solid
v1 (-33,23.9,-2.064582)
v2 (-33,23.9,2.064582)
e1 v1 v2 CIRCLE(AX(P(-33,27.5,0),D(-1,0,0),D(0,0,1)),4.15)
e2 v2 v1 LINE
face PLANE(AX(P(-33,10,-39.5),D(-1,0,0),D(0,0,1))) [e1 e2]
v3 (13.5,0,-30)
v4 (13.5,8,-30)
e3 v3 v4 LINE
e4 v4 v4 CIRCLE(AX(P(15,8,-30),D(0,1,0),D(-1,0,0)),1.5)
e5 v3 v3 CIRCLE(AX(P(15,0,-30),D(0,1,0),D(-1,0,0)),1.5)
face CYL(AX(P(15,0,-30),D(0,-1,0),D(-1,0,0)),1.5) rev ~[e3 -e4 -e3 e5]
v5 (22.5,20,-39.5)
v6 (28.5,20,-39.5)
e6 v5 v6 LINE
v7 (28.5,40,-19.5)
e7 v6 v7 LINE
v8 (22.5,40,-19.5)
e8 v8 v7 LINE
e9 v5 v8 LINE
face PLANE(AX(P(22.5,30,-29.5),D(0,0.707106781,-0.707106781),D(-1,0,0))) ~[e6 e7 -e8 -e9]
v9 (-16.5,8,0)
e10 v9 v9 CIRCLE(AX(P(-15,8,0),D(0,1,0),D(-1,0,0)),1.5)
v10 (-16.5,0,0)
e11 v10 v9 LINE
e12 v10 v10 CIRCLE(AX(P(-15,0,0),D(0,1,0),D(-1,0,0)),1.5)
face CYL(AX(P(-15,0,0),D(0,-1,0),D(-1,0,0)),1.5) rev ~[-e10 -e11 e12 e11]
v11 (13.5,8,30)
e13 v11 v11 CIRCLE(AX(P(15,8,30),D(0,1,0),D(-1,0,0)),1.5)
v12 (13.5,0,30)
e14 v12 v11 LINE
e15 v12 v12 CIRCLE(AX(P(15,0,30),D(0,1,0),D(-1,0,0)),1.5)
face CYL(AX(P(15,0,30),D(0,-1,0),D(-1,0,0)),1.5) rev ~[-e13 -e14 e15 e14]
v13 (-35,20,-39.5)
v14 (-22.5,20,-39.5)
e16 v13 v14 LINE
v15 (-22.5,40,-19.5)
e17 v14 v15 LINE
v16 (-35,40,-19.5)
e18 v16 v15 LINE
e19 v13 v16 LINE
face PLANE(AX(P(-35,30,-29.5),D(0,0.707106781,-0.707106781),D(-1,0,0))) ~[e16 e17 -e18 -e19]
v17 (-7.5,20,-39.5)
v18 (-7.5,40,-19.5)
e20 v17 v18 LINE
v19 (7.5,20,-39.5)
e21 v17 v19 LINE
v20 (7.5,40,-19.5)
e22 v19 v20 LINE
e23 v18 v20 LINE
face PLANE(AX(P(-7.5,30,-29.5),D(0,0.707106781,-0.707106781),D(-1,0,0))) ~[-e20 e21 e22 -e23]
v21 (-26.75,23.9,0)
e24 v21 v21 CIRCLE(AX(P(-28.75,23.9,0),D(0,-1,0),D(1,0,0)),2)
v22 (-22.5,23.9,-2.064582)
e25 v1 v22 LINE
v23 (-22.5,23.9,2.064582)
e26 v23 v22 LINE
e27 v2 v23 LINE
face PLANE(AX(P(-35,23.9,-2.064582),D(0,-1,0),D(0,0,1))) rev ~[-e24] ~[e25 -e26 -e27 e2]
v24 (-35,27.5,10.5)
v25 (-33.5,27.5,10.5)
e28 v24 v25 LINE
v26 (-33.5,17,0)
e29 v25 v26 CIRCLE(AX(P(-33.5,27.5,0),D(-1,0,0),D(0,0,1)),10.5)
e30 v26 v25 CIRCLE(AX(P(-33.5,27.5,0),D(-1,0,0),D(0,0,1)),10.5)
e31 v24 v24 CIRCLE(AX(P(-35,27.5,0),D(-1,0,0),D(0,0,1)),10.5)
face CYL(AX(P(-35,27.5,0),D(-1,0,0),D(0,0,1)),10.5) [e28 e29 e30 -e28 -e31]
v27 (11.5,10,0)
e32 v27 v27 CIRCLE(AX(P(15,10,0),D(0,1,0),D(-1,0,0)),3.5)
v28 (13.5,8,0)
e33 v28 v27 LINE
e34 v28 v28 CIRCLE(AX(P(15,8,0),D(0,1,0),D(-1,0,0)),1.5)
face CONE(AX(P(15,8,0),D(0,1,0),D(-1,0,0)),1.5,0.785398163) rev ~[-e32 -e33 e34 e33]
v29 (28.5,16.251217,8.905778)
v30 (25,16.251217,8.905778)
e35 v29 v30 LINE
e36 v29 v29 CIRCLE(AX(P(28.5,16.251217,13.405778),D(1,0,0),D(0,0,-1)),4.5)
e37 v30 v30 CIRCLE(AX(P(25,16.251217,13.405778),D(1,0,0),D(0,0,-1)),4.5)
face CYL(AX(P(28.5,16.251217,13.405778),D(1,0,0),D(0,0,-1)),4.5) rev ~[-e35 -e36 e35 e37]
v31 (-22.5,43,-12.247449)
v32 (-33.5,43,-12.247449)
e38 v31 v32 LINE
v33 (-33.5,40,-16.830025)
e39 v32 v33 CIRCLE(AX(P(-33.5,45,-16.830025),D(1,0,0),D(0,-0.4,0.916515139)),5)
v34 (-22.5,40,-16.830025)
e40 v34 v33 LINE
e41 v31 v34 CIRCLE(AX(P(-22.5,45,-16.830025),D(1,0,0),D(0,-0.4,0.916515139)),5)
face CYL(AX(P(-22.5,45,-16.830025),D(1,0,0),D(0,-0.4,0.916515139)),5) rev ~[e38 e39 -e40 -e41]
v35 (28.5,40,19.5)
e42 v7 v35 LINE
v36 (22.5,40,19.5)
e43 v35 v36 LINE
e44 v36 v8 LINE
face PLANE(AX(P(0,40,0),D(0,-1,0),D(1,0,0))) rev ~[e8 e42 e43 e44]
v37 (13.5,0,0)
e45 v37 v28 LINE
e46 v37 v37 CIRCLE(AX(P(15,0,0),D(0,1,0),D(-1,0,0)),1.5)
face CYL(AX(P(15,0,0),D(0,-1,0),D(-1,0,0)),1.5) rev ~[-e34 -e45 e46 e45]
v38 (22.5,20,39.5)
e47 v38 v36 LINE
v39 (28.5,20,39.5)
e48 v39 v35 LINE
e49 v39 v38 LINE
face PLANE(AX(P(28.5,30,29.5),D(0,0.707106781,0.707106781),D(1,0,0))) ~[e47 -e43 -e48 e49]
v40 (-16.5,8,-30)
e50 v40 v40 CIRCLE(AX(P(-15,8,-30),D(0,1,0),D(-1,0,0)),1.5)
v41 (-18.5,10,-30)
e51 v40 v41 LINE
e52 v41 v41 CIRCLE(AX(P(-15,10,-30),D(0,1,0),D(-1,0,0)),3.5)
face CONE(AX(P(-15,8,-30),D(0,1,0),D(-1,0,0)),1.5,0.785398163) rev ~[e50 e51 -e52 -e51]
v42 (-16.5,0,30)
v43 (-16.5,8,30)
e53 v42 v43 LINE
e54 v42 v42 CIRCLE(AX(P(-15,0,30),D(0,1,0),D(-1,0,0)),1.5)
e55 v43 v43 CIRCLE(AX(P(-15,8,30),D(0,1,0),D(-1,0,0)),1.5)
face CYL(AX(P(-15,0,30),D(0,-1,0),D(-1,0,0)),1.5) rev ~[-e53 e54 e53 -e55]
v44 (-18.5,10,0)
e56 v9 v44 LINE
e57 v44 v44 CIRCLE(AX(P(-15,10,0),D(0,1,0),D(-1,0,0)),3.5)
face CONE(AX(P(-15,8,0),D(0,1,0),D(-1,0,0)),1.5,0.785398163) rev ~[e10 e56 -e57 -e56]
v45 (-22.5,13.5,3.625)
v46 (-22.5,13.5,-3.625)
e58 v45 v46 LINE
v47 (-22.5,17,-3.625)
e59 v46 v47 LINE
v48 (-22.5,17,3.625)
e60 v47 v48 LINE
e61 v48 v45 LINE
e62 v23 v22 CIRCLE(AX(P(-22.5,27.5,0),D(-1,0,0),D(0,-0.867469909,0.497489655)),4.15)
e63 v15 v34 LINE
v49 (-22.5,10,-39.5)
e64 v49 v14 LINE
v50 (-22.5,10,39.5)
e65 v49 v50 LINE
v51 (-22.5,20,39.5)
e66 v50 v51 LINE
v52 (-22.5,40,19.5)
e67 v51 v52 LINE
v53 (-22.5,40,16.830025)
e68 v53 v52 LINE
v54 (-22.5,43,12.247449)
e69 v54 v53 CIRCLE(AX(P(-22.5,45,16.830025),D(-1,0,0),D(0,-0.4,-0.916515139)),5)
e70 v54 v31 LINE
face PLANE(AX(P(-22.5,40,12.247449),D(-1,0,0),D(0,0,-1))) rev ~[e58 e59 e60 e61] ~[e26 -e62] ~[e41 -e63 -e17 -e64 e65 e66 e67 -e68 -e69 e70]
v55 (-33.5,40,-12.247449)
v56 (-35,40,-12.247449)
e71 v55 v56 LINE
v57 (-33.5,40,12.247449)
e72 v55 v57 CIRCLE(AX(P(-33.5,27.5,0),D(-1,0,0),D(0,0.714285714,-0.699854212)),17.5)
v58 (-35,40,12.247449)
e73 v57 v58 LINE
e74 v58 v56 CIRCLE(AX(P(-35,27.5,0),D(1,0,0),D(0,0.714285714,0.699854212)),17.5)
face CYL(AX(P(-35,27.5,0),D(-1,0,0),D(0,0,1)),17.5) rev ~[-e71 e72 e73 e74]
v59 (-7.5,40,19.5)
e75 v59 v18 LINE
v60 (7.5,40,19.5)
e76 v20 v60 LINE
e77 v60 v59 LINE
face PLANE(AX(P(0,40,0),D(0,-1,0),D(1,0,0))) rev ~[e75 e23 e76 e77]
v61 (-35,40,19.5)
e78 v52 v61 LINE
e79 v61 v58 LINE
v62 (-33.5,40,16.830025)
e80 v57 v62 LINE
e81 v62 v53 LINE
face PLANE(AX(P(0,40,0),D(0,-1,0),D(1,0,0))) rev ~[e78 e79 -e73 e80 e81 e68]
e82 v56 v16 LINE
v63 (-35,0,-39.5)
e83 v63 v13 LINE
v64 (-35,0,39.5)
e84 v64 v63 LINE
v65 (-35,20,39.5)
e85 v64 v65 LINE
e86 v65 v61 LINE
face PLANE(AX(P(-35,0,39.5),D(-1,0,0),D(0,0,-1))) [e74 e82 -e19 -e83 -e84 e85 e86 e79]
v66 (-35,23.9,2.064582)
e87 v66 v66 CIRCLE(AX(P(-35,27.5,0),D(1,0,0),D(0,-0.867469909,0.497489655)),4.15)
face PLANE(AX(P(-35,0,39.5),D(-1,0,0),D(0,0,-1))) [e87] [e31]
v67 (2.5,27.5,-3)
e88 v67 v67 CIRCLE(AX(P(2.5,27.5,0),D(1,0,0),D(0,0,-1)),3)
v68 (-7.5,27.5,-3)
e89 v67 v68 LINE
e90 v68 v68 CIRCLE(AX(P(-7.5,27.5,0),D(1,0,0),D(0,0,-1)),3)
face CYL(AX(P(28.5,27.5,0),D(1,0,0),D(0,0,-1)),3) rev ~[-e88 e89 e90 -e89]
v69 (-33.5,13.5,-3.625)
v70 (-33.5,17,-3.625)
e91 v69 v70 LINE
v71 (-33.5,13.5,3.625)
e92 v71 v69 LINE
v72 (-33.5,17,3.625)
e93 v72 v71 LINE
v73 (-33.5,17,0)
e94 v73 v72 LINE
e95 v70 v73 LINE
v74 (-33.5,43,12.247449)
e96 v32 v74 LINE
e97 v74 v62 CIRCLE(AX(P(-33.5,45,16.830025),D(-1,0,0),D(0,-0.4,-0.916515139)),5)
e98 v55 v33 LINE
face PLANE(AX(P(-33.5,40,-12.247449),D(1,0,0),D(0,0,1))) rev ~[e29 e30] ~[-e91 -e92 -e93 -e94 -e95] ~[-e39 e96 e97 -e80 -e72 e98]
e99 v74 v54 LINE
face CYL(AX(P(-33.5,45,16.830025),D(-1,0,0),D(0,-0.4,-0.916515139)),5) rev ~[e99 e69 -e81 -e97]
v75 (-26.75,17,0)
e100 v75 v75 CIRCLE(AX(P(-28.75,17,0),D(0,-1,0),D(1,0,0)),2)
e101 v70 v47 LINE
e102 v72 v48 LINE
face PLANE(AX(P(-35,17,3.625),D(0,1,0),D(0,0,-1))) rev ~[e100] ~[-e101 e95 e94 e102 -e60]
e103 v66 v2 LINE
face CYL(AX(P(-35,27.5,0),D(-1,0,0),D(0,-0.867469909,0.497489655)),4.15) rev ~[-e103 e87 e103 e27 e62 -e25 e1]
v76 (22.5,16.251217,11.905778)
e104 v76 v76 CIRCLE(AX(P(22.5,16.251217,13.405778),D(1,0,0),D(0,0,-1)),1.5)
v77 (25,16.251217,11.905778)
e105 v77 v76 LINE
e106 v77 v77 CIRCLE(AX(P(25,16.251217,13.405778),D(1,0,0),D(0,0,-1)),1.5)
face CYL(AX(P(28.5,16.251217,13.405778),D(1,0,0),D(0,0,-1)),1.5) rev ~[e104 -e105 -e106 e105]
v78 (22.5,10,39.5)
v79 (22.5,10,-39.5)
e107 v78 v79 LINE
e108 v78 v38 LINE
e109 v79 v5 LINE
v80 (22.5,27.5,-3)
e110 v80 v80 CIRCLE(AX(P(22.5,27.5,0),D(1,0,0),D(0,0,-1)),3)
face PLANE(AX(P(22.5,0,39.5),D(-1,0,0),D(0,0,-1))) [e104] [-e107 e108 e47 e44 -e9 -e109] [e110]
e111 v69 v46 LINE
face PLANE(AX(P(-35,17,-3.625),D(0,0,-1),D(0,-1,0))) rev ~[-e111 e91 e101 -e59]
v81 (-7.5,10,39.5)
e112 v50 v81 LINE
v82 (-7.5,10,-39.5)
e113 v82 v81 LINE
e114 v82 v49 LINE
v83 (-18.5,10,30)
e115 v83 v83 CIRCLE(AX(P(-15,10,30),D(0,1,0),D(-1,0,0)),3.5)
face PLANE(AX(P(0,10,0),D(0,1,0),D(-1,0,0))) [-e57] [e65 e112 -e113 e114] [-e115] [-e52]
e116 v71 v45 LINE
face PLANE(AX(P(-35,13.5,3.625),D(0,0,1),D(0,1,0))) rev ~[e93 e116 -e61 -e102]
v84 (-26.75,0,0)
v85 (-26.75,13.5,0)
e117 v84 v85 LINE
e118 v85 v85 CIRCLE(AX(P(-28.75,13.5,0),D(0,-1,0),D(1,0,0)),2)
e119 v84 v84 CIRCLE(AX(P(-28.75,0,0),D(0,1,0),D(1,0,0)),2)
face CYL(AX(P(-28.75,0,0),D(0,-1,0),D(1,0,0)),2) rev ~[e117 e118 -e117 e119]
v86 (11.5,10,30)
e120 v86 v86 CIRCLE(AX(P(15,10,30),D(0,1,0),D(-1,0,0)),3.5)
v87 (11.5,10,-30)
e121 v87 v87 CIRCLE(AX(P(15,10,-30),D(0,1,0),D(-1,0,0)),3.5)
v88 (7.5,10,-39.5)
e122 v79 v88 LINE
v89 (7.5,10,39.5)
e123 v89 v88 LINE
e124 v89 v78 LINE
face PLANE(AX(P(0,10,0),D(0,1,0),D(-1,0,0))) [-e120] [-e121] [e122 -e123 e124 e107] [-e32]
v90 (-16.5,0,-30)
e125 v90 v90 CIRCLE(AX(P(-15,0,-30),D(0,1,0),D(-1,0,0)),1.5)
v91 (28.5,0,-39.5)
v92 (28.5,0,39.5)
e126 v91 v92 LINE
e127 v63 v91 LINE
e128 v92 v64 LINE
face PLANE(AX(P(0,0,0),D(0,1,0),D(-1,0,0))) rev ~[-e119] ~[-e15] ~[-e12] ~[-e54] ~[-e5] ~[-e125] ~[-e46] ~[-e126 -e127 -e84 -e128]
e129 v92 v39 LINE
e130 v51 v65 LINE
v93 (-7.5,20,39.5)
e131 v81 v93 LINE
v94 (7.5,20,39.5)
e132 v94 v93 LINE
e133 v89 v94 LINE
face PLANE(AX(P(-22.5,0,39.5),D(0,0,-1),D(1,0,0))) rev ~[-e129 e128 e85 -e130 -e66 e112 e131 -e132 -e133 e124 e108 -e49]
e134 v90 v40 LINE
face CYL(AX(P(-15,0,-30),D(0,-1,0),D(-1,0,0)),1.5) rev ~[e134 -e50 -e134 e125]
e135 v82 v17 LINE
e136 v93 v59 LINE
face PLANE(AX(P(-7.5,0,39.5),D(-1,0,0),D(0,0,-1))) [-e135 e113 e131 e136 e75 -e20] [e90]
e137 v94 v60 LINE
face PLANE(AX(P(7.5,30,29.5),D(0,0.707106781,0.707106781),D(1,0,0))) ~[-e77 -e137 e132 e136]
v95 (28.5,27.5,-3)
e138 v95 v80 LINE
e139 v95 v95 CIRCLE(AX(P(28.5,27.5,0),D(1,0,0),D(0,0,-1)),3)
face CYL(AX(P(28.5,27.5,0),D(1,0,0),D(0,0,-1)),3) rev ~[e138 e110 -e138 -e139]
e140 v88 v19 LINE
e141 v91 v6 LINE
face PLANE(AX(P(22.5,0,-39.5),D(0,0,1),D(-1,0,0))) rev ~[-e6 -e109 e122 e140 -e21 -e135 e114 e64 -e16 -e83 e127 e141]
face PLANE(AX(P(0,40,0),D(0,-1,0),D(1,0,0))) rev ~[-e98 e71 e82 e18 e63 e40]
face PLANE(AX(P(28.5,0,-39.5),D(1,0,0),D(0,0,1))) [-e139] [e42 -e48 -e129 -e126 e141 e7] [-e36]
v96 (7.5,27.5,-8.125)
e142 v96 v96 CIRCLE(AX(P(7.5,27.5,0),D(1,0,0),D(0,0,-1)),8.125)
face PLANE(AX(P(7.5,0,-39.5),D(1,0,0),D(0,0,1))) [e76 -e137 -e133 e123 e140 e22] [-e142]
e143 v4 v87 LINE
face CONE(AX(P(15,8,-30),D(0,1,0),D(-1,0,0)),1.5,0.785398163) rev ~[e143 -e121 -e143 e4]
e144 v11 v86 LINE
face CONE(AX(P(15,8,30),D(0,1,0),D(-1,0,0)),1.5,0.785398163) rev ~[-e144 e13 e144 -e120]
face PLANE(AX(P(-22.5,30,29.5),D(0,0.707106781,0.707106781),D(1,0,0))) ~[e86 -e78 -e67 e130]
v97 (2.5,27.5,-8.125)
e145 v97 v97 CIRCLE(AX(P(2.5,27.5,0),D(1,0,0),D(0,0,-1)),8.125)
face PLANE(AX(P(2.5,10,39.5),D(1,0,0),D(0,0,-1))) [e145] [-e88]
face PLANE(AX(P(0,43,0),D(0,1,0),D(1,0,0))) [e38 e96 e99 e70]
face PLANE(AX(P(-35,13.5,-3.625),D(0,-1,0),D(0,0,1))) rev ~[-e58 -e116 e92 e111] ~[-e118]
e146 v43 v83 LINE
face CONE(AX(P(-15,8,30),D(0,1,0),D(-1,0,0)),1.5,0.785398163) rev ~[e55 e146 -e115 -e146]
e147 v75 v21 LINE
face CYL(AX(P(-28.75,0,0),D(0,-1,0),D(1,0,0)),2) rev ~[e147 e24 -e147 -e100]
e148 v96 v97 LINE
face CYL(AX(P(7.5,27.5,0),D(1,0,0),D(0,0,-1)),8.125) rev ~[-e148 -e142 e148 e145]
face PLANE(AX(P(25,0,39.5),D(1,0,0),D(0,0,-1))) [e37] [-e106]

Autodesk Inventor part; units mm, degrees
ref_plane "YZ Plane" through (0, 0, 0) normal (1, 0, 0) x (0, 1, 0)
ref_plane "XZ Plane" through (0, 0, 0) normal (0, 1, 0) x (-1, 0, 0)
sketch "Sketch1" plane through (0, 0, 0) normal (0, 1, 0) x (-1, 0, 0)
  line L0 (15, 30) -> (-15, 30)
  line L1 (-15, 30) -> (-15, -30)
  line L2 (-15, -30) -> (15, -30)
  line L3 (15, -30) -> (15, 30)
  line L4 (15, 30) -> (-15, -30) construction
  line L5 (-15, 30) -> (15, -30) construction
  circle A0 centre (15, 30) radius 1.5
  circle A1 centre (15, 0) radius 1.5
  circle A2 centre (15, -30) radius 1.5
  circle A3 centre (-15, -30) radius 1.5
  circle A4 centre (-15, 0) radius 1.5
  circle A5 centre (-15, 30) radius 1.5
  line L6 (22.5, 39.5) -> (-22.5, 39.5)
  line L7 (-22.5, 39.5) -> (-22.5, -39.5)
  line L8 (-22.5, -39.5) -> (22.5, -39.5)
  line L9 (22.5, -39.5) -> (22.5, 39.5)
  line L10 (22.5, 39.5) -> (-22.5, -39.5) construction
  line L11 (-22.5, 39.5) -> (22.5, -39.5) construction
  point P0 (0, 0)
  dimension "d0" = 30
  dimension "d1" = 60
  dimension "d2" = 3
  dimension "d3" = 3
  dimension "d4" = 3
  dimension "d5" = 3
  dimension "d6" = 3
  dimension "d7" = 3
  dimension "d8" = 7.5
  dimension "d9" = 9.5
sketch "Sketch1 outline for Extrusion1" plane through (0, 0, 0) normal (0, 1, 0) x (-1, 0, 0)
  line L0 (22.5, 39.5) -> (-22.5, 39.5)
  line L1 (22.5, -39.5) -> (22.5, 39.5)
  line L2 (-22.5, 39.5) -> (-22.5, -39.5)
  line L3 (-22.5, -39.5) -> (22.5, -39.5)
  circle A0 centre (-15, -30) radius 1.5
  circle A1 centre (15, -30) radius 1.5
  circle A2 centre (-15, 0) radius 1.5
  circle A3 centre (-15, 30) radius 1.5
  circle A4 centre (15, 0) radius 1.5
  circle A5 centre (15, 30) radius 1.5
extrude "Extrusion1" add sketch "Sketch1 outline for Extrusion1" along normal blind 10
chamfer "Chamfer1" distance 2 angle 45 6 edges at (-13.5, 10, 30) (-13.5, 10, 0) (-13.5, 10, -30) (16.5, 10, -30) (16.5, 10, 0) (16.5, 10, 30)
sketch "Sketch2" plane through (0, 0, 0) normal (0, -1, 0) x (1, 0, 0)
  line L0 (-22.5, 39.5) -> (22.5, 39.5) projected
  line L1 (22.5, 39.5) -> (28.5, 39.5)
  line L2 (28.5, 39.5) -> (28.5, -39.5)
  line L3 (28.5, -39.5) -> (22.5, -39.5)
  line L4 (22.5, -39.5) -> (22.5, 39.5)
  line L5 (-22.5, -39.5) -> (-22.5, 39.5) projected
  line L6 (-22.5, 39.5) -> (-35, 39.5)
  line L7 (-35, 39.5) -> (-35, -39.5)
  line L8 (-35, -39.5) -> (-22.5, -39.5)
  line L9 (-22.5, -39.5) -> (-22.5, 39.5)
  line L10 (22.5, -39.5) -> (-22.5, -39.5) projected
  line L11 (-7.5, 39.5) -> (7.5, 39.5)
  line L12 (7.5, 39.5) -> (7.5, -39.5)
  line L13 (7.5, -39.5) -> (-7.5, -39.5)
  line L14 (-7.5, -39.5) -> (-7.5, 39.5)
  point P0 (0, 0)
  point P1 (7.5, 39.5)
  dimension "d15" = 6
  dimension "d16" = 12.5
  dimension "d19" = 15
  dimension "d20" = 15
sketch "Sketch2 outline for Extrusion2" plane through (0, 0, 0) normal (0, -1, 0) x (1, 0, 0)
  line L0 (-7.5, 39.5) -> (-7.5, -39.5)
  line L1 (7.5, 39.5) -> (-7.5, 39.5)
  line L2 (7.5, -39.5) -> (7.5, 39.5)
  line L3 (-7.5, -39.5) -> (7.5, -39.5)
  line L4 (-22.5, 39.5) -> (-35, 39.5)
  line L5 (-22.5, -39.5) -> (-22.5, 39.5)
  line L6 (-35, -39.5) -> (-22.5, -39.5)
  line L7 (-35, 39.5) -> (-35, -39.5)
  line L8 (22.5, 39.5) -> (22.5, -39.5)
  line L9 (28.5, 39.5) -> (22.5, 39.5)
  line L10 (28.5, -39.5) -> (28.5, 39.5)
  line L11 (22.5, -39.5) -> (28.5, -39.5)
extrude "Extrusion2" add sketch "Sketch2 outline for Extrusion2" against normal blind 40
sketch "Sketch3" plane through (28.5, 0, 39.5) normal (1, 0, 0) x (0, 0, -1)
  line L0 (0, 40) -> (79, 40) projected
  line L1 (39.5, 40) -> (39.5, 27.5)
  circle A0 centre (39.5, 27.5) radius 8.125
  circle A1 centre (39.5, 27.5) radius 3
  point P0 (39.5, 0)
  dimension "d21" = 16.25
  dimension "d22" = 12.5
  dimension "d23" = 6
sketch "Sketch3 outline for Extrusion3" plane through (28.5, 0, 39.5) normal (1, 0, 0) x (0, 0, -1)
  circle A0 centre (39.5, 27.5) radius 3
extrude "Extrusion3" cut sketch "Sketch3 outline for Extrusion3" against normal blind 110.5
chamfer "Chamfer2" distance 20 angle 45 6 edges at (25.5, 40, -39.5) (0, 40, -39.5) (-28.75, 40, -39.5) (-28.75, 40, 39.5) (0, 40, 39.5) (25.5, 40, 39.5)
sketch "Sketch4" plane through (-35, 10, -39.5) normal (-1, 0, 0) x (0, 0, 1)
  circle A0 centre (39.5, 17.5) radius 3
  circle A1 centre (39.5, 17.5) radius 4.15
  line L0 (37.435418, 13.9) -> (41.564582, 13.9)
  point P0 (39.5, -10)
  dimension "d29" = 8.3
  dimension "d63" = 3.6
sketch "Sketch4 outline for Extrusion4" plane through (-35, 10, -39.5) normal (-1, 0, 0) x (0, 0, 1)
  line L0 (37.435418, 13.9) -> (41.564582, 13.9)
  arc A0 (41.564582, 13.9) -> (37.435418, 13.9) centre (39.5, 17.5) ccw
  circle A1 centre (39.5, 17.5) radius 3
extrude "Extrusion4" cut sketch "Sketch4 outline for Extrusion4" against normal blind 15
sketch "Sketch5" plane through (-35, 10, -39.5) normal (-1, 0, 0) x (0, 0, 1)
  line L0 (35.875, 7) -> (43.125, 7)
  line L1 (43.125, 7) -> (43.125, 3.5)
  line L2 (43.125, 3.5) -> (35.875, 3.5)
  line L3 (35.875, 3.5) -> (35.875, 7)
  circle A0 centre (39.5, 17.5) radius 3 projected
  line L4 (20, 30) -> (59, 30) projected
  point P0 (39.5, -10)
  dimension "d33" = 7.25
  dimension "d34" = 3.5
  dimension "d35" = 3.625
  dimension "d36" = 23
sketch "Sketch5 outline for Extrusion5" plane through (-35, 10, -39.5) normal (-1, 0, 0) x (0, 0, 1)
  line L0 (35.875, 7) -> (35.875, 3.5)
  line L1 (43.125, 7) -> (35.875, 7)
  line L2 (43.125, 3.5) -> (43.125, 7)
  line L3 (35.875, 3.5) -> (43.125, 3.5)
extrude "Extrusion5" cut sketch "Sketch5 outline for Extrusion5" against normal blind 15
sketch "Sketch6" plane through (0, 0, 0) normal (0, 1, 0) x (1, 0, 0)
  circle A0 centre (-28.75, 0) radius 2
  line L0 (-35, 19.5) -> (-35, -19.5) projected
  point P0 (0, 0)
  dimension "d42" = 4
  dimension "d43" = 6.25
sketch "Sketch6 outline for Extrusion6" plane through (0, 0, 0) normal (0, 1, 0) x (1, 0, 0)
  circle A0 centre (-28.75, 0) radius 2
extrude "Extrusion6" cut sketch "Sketch6 outline for Extrusion6" along normal blind 26.5
sketch "Sketch4 outline for Extrusion7" plane through (-35, 10, -39.5) normal (-1, 0, 0) x (0, 0, 1)
  circle A0 centre (39.5, 17.5) radius 4.15
extrude "Extrusion7" cut sketch "Sketch4 outline for Extrusion7" against normal blind 2
sketch "Sketch7" plane through (-35, 0, -39.5) normal (-1, 0, 0) x (0, 0, 1)
  circle A0 centre (39.5, 27.5) radius 3 projected
  circle A1 centre (39.5, 27.5) radius 10.5
  circle A2 centre (39.5, 27.5) radius 17.5
  point P0 (39.5, 0)
  dimension "d46" = 21
  dimension "d47" = 35
sketch "Sketch7 outline for Extrusion8" plane through (-35, 0, -39.5) normal (-1, 0, 0) x (0, 0, 1)
  circle A0 centre (39.5, 27.5) radius 17.5
  circle A1 centre (39.5, 27.5) radius 10.5
extrude "Extrusion8" cut sketch "Sketch7 outline for Extrusion8" against normal blind 1.5
sketch "Sketch8" plane through (7.5, 10, 39.5) normal (1, 0, 0) x (0, 0, -1)
  circle A0 centre (39.5, 17.5) radius 3 projected
  circle A1 centre (39.5, 17.5) radius 8.125
  point P0 (39.5, -10)
  dimension "d50" = 16.25
sketch "Sketch8 outline for Extrusion9" plane through (7.5, 10, 39.5) normal (1, 0, 0) x (0, 0, -1)
  circle A0 centre (39.5, 17.5) radius 8.125
  circle A1 centre (39.5, 17.5) radius 3
extrude "Extrusion9" cut sketch "Sketch8 outline for Extrusion9" against normal blind 5
ref_plane "Work Plane1" through (0, 10, 39.5) normal (1, 0, 0) x (0, 0, -1)
sketch "Sketch9" plane through (28.5, 0, 39.5) normal (1, 0, 0) x (0, 0, -1)
  circle A0 centre (26.094222, 16.251217) radius 4.5
  circle A1 centre (26.094222, 16.251217) radius 1.5
  circle A2 centre (39.5, 27.5) radius 3
  line L0 (39.5, 27.5) -> (11.266144, 27.5)
  arc A3 (41.564582, 23.9) -> (37.435418, 23.9) centre (39.5, 27.5) ccw
  line L1 (39.5, 27.5) -> (26.094222, 16.251217)
  point P0 (39.5, 0)
  dimension "d53" = 9
  dimension "d54" = 3
  dimension "d55" = 17.5
  dimension "d60" = 40
sketch "Sketch9 outline for Extrusion10" plane through (28.5, 0, 39.5) normal (1, 0, 0) x (0, 0, -1)
  circle A0 centre (26.094222, 16.251217) radius 1.5
extrude "Extrusion10" cut sketch "Sketch9 outline for Extrusion10" against normal blind 10
sketch "Sketch9 outline for Extrusion11" plane through (28.5, 0, 39.5) normal (1, 0, 0) x (0, 0, -1)
  circle A0 centre (26.094222, 16.251217) radius 4.5
  circle A1 centre (26.094222, 16.251217) radius 1.5
extrude "Extrusion11" cut sketch "Sketch9 outline for Extrusion11" against normal blind 3.5
sketch "Sketch10" plane through (0, 40, 0) normal (0, 1, 0) x (1, 0, 0)
  line L0 (-33.5, -12.247449) -> (-35, -12.247449)
  line L1 (-35, -12.247449) -> (-35, -19.5)
  line L2 (-22.5, -19.5) -> (-35, -19.5)
  line L3 (-22.5, -19.5) -> (-22.5, 19.5)
  line L4 (-35, 19.5) -> (-22.5, 19.5)
  line L5 (-35, 19.5) -> (-35, 12.247449)
  line L6 (-35, 12.247449) -> (-33.5, 12.247449)
  line L7 (-33.5, 12.247449) -> (-33.5, -12.247449)
  line L8 (-22.5, 39.5) -> (-22.5, -39.5)
  line L9 (-35, 12.247449) -> (-22.5, 12.247449)
  line L10 (-22.5, 12.247449) -> (-22.5, -12.247449)
  line L11 (-22.5, -12.247449) -> (-35, -12.247449)
  line L12 (-35, -12.247449) -> (-35, 12.247449)
  point P0 (0, 0)
sketch "Sketch10 outline for Extrusion12" plane through (0, 40, 0) normal (0, 1, 0) x (1, 0, 0)
  line L0 (-33.5, -12.247449) -> (-22.5, -12.247449)
  line L1 (-33.5, 12.247449) -> (-33.5, -12.247449)
  line L2 (-22.5, 12.247449) -> (-33.5, 12.247449)
  line L3 (-22.5, -12.247449) -> (-22.5, 12.247449)
extrude "Extrusion12" add sketch "Sketch10 outline for Extrusion12" along normal blind 3
fillet "Fillet1" radius 5 2 edges at (-28, 40, -12.2474) (-28, 40, 12.2474)
properties part number "Gimbal_2"
